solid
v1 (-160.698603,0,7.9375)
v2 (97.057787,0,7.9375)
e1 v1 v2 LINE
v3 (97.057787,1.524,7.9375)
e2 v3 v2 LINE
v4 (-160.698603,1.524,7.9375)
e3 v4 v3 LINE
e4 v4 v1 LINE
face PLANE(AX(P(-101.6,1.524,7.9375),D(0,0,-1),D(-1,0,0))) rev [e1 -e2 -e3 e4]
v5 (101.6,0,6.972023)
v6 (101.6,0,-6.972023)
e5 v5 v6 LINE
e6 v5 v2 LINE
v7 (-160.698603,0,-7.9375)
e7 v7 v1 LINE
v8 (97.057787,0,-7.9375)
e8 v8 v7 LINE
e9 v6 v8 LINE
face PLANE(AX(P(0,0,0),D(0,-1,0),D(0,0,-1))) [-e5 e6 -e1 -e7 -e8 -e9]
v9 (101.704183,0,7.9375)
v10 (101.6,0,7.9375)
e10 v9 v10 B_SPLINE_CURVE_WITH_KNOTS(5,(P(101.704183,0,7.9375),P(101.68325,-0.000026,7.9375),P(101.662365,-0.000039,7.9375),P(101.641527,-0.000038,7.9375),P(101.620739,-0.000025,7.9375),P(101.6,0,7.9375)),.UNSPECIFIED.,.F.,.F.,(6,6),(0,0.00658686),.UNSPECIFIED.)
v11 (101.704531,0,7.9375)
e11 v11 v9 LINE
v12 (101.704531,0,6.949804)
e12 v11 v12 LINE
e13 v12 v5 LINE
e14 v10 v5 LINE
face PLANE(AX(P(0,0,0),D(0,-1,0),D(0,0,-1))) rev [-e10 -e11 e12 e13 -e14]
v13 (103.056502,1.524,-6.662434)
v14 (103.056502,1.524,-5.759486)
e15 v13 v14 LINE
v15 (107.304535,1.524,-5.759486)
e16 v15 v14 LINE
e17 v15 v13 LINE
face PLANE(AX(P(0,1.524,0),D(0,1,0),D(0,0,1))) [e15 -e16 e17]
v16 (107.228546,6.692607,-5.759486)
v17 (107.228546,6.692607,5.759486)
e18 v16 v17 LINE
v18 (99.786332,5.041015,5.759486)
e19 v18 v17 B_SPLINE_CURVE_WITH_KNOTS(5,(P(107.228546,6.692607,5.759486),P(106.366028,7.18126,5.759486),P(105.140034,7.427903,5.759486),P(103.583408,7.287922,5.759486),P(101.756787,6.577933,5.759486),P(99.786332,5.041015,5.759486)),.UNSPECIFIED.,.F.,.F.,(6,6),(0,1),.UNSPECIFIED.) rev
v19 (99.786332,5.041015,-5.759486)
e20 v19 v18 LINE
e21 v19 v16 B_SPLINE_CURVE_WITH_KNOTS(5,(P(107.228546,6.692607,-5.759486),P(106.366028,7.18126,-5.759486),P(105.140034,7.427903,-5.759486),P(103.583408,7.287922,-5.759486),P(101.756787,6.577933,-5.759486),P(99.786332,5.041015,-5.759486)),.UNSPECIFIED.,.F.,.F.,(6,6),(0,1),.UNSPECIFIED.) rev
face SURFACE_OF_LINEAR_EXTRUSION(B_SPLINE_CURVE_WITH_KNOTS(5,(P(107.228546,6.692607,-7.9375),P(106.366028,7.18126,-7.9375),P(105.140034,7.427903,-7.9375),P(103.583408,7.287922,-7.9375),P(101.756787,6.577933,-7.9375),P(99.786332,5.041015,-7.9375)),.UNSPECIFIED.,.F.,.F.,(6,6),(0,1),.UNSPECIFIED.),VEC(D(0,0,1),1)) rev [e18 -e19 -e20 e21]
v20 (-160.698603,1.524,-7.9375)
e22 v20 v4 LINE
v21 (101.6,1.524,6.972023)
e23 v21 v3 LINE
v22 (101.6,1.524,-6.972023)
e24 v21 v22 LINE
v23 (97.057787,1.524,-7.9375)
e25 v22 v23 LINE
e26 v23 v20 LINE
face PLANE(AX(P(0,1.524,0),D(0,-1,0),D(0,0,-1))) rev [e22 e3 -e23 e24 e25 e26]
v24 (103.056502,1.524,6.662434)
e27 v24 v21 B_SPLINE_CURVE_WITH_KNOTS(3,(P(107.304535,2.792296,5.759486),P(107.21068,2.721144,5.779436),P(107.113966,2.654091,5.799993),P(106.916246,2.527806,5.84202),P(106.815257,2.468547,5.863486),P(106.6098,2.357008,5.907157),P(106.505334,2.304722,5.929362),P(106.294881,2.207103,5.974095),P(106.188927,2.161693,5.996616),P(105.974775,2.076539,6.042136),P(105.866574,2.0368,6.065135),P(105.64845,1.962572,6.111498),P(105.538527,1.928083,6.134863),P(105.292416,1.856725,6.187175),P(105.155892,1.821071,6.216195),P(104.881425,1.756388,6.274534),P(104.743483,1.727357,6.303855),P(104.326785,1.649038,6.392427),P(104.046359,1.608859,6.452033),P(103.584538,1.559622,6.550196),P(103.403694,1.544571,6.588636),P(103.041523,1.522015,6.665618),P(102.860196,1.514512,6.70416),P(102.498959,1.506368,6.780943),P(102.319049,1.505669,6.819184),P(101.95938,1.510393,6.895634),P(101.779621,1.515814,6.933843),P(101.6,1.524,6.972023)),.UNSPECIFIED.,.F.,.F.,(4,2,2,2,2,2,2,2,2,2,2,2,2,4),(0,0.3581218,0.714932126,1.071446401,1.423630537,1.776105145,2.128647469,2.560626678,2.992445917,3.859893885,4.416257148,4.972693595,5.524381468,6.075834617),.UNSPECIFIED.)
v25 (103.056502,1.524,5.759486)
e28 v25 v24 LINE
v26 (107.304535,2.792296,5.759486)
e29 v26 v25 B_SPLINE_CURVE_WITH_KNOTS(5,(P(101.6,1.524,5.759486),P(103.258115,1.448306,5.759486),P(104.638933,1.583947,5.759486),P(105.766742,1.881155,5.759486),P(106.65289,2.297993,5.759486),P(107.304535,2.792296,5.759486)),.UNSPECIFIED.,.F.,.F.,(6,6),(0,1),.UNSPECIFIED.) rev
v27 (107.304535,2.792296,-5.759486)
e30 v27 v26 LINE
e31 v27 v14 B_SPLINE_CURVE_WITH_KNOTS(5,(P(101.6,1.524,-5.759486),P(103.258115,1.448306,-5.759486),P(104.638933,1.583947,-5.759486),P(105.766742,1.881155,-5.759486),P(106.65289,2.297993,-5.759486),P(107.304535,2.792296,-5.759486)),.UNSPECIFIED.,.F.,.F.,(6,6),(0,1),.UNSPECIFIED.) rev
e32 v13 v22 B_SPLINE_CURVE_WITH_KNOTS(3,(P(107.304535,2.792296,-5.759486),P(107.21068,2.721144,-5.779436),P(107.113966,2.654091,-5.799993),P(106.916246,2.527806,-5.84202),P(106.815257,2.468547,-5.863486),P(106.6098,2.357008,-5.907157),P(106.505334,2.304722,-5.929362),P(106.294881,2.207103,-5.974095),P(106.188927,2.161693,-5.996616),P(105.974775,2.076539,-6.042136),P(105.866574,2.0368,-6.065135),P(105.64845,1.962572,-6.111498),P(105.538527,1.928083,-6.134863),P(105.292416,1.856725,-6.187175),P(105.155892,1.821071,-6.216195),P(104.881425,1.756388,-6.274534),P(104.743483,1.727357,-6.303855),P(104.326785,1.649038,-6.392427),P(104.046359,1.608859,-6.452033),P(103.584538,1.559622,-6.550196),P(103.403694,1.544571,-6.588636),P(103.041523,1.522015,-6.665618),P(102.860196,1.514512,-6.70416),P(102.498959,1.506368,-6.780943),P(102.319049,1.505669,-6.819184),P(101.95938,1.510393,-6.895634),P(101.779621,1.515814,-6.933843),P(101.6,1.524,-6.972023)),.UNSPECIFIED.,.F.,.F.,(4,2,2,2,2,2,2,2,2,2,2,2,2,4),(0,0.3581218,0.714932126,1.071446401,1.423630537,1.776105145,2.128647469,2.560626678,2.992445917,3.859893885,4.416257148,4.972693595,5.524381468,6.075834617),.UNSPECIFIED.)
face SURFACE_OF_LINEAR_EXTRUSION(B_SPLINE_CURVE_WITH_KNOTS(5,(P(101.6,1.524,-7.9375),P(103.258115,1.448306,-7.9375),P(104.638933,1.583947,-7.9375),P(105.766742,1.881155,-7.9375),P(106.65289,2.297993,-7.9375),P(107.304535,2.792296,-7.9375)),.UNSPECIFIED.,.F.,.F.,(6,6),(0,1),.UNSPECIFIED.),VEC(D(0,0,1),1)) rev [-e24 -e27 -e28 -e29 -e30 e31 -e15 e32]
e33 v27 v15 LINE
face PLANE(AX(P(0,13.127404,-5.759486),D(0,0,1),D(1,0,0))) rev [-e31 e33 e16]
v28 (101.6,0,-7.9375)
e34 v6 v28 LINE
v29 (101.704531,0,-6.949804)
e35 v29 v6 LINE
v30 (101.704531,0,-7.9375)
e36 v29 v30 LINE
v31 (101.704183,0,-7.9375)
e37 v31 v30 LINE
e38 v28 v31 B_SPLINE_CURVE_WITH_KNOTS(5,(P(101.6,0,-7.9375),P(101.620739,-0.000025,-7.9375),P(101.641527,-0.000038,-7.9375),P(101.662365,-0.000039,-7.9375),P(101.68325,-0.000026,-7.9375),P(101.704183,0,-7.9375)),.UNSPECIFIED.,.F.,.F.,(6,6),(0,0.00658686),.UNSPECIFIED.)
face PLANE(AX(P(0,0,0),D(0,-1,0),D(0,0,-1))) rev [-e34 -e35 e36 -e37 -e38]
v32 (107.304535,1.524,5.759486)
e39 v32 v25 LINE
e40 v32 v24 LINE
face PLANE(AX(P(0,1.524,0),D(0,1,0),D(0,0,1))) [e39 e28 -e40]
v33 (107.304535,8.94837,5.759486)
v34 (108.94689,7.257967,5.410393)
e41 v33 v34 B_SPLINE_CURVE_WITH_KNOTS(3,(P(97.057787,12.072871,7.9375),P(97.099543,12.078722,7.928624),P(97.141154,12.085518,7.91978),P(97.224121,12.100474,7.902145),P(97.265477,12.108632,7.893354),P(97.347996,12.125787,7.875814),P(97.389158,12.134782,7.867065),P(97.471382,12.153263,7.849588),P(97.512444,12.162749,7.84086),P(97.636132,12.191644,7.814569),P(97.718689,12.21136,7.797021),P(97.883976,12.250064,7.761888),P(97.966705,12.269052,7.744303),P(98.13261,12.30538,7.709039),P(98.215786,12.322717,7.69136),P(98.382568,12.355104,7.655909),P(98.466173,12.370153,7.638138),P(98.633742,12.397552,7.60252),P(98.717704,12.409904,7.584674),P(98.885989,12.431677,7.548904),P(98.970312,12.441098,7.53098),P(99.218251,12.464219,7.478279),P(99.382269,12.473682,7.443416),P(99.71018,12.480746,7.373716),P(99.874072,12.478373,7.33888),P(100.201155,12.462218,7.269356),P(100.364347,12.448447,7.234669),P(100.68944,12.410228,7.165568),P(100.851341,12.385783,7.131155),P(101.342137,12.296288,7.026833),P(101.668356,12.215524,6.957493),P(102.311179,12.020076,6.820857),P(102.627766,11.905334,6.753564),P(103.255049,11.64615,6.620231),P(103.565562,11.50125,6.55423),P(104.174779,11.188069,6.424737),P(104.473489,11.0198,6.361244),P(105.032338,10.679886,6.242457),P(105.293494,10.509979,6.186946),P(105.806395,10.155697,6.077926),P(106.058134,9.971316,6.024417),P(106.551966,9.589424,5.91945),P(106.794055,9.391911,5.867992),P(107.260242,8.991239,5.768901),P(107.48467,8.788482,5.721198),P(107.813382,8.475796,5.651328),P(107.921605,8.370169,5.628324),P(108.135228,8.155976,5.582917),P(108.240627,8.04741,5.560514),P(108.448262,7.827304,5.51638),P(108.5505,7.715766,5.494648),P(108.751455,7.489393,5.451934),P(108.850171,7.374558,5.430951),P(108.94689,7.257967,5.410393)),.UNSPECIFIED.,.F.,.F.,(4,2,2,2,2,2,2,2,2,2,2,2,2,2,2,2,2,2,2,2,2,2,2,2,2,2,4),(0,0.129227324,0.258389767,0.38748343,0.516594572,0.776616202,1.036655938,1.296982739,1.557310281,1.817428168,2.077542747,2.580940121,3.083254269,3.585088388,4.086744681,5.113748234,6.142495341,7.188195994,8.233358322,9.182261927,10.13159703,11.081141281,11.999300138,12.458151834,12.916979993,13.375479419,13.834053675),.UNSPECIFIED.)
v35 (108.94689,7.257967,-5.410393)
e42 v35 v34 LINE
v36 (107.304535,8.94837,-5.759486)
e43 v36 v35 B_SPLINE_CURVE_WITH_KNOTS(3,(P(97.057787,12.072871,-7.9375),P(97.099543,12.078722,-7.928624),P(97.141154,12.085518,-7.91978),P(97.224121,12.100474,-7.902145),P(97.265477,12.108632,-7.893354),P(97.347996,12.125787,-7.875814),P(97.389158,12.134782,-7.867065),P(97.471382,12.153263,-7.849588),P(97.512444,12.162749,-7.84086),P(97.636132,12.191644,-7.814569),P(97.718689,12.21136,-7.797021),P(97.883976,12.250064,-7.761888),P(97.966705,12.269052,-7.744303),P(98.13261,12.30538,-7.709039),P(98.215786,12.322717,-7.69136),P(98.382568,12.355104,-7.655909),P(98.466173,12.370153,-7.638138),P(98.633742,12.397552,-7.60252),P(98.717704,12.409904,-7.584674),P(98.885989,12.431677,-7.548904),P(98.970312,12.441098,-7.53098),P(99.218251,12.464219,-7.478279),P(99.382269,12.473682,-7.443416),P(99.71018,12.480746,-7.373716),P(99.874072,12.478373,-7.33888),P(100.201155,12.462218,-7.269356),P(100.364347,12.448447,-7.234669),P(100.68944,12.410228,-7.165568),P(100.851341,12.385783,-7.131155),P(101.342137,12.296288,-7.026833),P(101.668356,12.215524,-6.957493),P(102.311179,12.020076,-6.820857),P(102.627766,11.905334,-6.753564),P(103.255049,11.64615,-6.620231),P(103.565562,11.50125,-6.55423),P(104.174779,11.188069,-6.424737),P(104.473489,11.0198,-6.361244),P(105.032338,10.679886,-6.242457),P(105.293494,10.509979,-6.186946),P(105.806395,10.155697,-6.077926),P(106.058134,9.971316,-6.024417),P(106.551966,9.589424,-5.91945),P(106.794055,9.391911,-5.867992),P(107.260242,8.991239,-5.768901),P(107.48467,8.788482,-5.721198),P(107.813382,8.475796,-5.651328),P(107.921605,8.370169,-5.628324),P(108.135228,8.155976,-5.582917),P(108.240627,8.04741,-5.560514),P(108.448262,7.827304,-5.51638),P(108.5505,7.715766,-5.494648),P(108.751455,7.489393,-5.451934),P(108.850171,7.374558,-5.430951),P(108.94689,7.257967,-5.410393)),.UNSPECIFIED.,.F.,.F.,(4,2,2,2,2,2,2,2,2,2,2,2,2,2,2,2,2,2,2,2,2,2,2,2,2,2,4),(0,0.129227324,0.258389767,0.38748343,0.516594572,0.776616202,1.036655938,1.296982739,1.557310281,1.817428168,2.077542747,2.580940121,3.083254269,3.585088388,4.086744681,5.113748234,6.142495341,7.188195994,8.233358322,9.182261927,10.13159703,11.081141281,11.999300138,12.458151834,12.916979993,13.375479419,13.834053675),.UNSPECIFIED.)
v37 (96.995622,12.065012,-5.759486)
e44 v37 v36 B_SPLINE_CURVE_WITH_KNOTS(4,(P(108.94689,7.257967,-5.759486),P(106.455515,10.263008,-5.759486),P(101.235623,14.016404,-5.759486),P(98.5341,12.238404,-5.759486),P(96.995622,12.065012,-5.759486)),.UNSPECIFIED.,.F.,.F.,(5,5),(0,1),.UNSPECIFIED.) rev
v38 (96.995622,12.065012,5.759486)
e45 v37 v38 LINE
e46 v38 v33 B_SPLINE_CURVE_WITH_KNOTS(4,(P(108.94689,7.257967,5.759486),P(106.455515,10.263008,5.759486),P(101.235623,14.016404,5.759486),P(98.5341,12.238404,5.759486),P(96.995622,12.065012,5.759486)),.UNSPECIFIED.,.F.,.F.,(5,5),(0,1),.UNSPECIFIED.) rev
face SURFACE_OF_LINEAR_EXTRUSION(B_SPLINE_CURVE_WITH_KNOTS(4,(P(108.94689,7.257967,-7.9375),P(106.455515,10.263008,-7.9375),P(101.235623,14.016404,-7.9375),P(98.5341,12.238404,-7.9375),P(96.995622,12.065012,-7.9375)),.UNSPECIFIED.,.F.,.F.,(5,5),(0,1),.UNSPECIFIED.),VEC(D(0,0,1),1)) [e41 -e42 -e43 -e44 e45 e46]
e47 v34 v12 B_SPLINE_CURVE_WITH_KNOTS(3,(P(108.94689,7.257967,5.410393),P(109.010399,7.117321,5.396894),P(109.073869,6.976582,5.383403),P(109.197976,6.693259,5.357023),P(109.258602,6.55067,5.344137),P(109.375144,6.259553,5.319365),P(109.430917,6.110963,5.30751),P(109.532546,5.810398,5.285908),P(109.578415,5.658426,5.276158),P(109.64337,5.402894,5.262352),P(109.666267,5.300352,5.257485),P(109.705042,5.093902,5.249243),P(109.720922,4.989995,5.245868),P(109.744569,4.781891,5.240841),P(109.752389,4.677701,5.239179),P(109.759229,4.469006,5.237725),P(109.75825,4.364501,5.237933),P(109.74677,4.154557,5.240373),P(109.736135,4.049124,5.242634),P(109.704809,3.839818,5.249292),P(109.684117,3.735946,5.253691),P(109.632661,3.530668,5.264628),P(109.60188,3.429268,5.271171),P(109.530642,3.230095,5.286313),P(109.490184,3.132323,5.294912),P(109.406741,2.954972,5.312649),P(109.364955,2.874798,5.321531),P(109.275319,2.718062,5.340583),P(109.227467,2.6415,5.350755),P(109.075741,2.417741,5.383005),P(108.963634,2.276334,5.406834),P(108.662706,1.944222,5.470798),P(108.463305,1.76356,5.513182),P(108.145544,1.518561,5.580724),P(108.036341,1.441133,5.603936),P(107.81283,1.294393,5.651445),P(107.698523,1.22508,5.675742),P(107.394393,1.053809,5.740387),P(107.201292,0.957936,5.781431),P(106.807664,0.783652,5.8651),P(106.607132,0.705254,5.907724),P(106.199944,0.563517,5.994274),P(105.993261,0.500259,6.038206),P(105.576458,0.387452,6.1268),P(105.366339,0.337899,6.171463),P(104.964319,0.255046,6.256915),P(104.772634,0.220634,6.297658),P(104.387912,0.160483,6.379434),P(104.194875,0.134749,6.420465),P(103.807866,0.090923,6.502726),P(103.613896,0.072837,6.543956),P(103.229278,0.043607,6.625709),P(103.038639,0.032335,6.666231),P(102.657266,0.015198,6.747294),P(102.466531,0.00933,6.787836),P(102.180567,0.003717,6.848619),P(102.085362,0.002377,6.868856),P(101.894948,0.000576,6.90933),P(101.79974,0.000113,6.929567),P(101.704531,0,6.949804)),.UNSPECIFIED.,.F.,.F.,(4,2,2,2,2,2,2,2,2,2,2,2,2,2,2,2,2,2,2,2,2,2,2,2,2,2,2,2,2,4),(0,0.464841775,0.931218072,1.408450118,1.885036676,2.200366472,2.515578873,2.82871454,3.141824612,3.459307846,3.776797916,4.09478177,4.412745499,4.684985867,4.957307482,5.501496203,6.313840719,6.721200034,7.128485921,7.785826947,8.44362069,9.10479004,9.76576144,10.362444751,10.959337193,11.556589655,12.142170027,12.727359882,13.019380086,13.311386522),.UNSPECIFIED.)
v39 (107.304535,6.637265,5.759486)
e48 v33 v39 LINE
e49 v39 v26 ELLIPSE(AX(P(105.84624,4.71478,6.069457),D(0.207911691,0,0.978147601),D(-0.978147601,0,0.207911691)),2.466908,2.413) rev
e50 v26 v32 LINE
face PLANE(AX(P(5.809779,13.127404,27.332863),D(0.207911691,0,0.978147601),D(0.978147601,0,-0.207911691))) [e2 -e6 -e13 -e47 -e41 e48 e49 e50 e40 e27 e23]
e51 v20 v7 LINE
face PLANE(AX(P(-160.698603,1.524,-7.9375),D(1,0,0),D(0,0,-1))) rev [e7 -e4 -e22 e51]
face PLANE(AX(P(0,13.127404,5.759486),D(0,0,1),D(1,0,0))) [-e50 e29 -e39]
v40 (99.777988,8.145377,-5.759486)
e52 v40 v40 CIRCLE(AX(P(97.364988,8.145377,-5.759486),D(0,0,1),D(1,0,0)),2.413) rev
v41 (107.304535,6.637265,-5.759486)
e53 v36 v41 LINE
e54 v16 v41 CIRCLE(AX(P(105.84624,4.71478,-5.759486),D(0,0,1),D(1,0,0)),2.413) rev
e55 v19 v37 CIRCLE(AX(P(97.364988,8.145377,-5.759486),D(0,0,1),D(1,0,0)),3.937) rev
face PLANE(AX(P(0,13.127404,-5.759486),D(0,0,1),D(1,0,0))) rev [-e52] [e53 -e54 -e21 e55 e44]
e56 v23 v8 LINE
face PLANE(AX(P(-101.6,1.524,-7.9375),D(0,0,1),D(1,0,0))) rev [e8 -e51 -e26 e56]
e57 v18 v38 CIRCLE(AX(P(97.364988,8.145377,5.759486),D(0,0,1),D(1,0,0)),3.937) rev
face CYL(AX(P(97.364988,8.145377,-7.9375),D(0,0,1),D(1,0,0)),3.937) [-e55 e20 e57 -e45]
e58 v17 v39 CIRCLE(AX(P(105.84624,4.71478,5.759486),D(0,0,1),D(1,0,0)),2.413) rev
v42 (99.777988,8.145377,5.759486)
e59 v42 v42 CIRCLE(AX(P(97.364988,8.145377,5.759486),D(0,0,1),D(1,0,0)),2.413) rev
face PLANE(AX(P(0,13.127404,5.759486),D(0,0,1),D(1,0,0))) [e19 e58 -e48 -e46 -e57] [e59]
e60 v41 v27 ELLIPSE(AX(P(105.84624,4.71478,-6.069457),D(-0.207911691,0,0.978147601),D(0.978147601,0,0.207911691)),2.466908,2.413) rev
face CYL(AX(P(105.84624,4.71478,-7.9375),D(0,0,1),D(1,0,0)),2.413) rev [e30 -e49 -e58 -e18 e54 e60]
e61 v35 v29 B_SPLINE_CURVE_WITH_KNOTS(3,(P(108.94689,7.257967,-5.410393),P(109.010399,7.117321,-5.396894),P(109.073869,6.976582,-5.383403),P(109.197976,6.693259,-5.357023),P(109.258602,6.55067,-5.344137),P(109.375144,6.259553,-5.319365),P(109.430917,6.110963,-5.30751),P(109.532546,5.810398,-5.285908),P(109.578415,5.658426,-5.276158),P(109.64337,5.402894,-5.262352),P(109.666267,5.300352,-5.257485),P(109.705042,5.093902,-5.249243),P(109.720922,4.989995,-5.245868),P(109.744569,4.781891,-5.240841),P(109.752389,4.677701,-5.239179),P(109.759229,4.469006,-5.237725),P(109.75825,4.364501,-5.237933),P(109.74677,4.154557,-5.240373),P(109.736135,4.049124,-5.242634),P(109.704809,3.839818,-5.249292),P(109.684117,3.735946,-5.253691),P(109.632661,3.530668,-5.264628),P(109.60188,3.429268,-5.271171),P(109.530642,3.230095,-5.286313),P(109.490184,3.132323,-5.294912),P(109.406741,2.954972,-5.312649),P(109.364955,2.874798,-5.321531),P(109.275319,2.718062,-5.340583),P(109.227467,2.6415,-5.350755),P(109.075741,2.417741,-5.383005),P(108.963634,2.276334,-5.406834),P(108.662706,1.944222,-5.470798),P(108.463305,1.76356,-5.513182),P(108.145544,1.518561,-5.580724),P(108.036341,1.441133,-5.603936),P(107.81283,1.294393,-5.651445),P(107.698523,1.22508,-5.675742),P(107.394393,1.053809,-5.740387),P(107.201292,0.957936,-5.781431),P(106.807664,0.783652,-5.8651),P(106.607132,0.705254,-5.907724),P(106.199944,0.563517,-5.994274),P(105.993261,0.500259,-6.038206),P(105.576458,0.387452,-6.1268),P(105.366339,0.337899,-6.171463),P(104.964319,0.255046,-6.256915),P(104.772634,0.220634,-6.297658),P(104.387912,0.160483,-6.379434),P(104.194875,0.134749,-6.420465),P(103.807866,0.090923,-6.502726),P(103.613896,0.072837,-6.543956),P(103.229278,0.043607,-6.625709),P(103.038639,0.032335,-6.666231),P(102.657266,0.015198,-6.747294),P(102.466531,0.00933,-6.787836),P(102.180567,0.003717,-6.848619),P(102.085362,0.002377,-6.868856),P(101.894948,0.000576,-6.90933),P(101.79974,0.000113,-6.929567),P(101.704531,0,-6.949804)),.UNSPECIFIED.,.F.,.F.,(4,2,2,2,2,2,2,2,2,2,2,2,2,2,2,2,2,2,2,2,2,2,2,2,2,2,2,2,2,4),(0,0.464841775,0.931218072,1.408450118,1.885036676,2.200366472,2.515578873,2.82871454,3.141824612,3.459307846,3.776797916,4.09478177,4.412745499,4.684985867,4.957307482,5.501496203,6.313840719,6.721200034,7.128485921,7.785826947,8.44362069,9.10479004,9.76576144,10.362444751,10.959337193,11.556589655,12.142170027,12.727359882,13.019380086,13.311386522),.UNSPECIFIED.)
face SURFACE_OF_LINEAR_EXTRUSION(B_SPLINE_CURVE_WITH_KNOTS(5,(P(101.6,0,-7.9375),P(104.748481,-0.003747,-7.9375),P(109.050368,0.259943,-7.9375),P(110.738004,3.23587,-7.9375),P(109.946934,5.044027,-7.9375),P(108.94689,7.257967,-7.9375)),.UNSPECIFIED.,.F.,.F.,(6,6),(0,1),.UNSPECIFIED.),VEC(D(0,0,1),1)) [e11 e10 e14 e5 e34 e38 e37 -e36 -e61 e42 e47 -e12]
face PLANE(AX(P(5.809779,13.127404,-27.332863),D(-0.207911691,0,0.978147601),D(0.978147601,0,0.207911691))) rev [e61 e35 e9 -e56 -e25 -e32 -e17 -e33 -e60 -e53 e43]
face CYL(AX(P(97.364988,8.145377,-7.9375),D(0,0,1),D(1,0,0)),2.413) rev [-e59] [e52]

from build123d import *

# Parameters (mm, degrees)
BOSS_EXTRUDE1_DEPTH     = 1.524
BOSS_EXTRUDE2_START     = -15.875
BOSS_EXTRUDE2_OUTLINE_R = 2.413
BOSS_EXTRUDE2_DEPTH     = 15.875
CUT_EXTRUDE1_DEPTH      = 162.377710637
CUT_EXTRUDE2_DEPTH      = 162.267022773


# Read off the part's stored shape, not the designer's step: Boss-Extrude2
with BuildPart() as part:
    # Sketch1 → Boss-Extrude1 (new body)
    with BuildSketch(Plane(origin=(0, 0, 0), x_dir=(1, 0, 0), z_dir=(0, 1, 0))):
        Polygon((-101.6, -7.9375), (-160.698602846, -7.9375), (-160.698602846, 7.9375), (-101.6, 7.9375), (101.6, 7.9375), (101.6, -7.9375), align=None)
    extrude(amount=BOSS_EXTRUDE1_DEPTH)

    # Boss-Extrude2 outline → Boss-Extrude2 (add)
    with BuildSketch(Plane.XY.offset(7.9375).offset(BOSS_EXTRUDE2_START)):
        with BuildLine():
            add(Edge.make_bspline(
                [(107.228546138, 6.692607406), (106.366027923, 7.18125968), (105.140033894, 7.42790314), (103.583408394, 7.287922485), (101.756786703, 6.577932625), (99.786331846, 5.041015057)],
                knots=[0, 0, 0, 0, 0, 0, 1, 1, 1, 1, 1, 1], degree=5))
            ThreePointArc((107.228546138, 6.692607406), (108.258782429, 4.761783473), (107.30453503, 2.792296286))
            add(Edge.make_bspline(
                [(101.6, 1.524), (103.258114517, 1.448306251), (104.638933259, 1.583946831), (105.766741539, 1.881154947), (106.652889556, 2.297992507), (107.30453503, 2.792296286)],
                knots=[0, 0, 0, 0, 0, 0, 1, 1, 1, 1, 1, 1], degree=5))
            Line((101.6, 1.524), (101.6, 0))
            add(Edge.make_bspline(
                [(101.6, 0), (104.748480566, -0.003746591), (109.050367624, 0.259943099), (110.73800353, 3.235869603), (109.946934459, 5.044027479), (108.94689031, 7.25796652)],
                knots=[0, 0, 0, 0, 0, 0, 1, 1, 1, 1, 1, 1], degree=5))
            add(Edge.make_bspline(
                [(108.94689031, 7.25796652), (106.455515071, 10.263008134), (101.235622898, 14.016404122), (98.534099755, 12.238404022), (96.99562172, 12.065011937)],
                knots=[0, 0, 0, 0, 0, 1, 1, 1, 1, 1], degree=4))
            ThreePointArc((96.99562172, 12.065011937), (93.706192437, 6.691697876), (99.786331846, 5.041015057))
        make_face()
        with Locations((97.364988112, 8.145377073)):
            Circle(BOSS_EXTRUDE2_OUTLINE_R, mode=Mode.SUBTRACT)
    extrude(amount=BOSS_EXTRUDE2_DEPTH)

    # Sketch6 → Cut-Extrude1 (cut, through all)
    with BuildSketch(Plane.XZ):
        Polygon((109.757786654, 7.9375), (101.6, 7.9375), (101.6, 6.972022749), (109.757786654, 5.238031667), align=None)
        Polygon((109.757786654, -5.238031667), (101.6, -6.972022749), (101.6, -7.9375), (109.757786654, -7.9375), align=None)
        Polygon((101.6, 7.9375), (97.057786654, 7.9375), (101.6, 6.972022749), align=None)
        Polygon((101.6, -7.9375), (101.6, -6.972022749), (97.057786654, -7.9375), align=None)
    extrude(amount=-CUT_EXTRUDE1_DEPTH, mode=Mode.SUBTRACT)

    # Sketch7 → Cut-Extrude2 (cut, through all)
    with BuildSketch(Plane(origin=(0, 1.524, 0), x_dir=(1, 0, 0), z_dir=(0, 1, 0))):
        Polygon((101.6, 5.759486397), (107.30453503, 5.759486397), (107.30453503, 11.866720982), (85.552872932, 11.866720982), (85.552872932, 7.9375), (97.057786654, 7.9375), (101.6, 6.972022749), align=None)
        Polygon((85.552872932, 5.759486397), (101.6, 5.759486397), (101.6, 6.972022749), (97.057786654, 7.9375), (85.552872932, 7.9375), align=None)
        Polygon((101.6, -6.972022749), (101.6, -5.759486397), (85.552872932, -5.759486397), (85.552872932, -7.9375), (97.057786654, -7.9375), align=None)
        Polygon((107.30453503, -7.9375), (107.30453503, -5.759486397), (101.6, -5.759486397), (101.6, -6.972022749), (97.057786654, -7.9375), align=None)
    extrude(amount=CUT_EXTRUDE2_DEPTH, mode=Mode.SUBTRACT)


solid = part.part
